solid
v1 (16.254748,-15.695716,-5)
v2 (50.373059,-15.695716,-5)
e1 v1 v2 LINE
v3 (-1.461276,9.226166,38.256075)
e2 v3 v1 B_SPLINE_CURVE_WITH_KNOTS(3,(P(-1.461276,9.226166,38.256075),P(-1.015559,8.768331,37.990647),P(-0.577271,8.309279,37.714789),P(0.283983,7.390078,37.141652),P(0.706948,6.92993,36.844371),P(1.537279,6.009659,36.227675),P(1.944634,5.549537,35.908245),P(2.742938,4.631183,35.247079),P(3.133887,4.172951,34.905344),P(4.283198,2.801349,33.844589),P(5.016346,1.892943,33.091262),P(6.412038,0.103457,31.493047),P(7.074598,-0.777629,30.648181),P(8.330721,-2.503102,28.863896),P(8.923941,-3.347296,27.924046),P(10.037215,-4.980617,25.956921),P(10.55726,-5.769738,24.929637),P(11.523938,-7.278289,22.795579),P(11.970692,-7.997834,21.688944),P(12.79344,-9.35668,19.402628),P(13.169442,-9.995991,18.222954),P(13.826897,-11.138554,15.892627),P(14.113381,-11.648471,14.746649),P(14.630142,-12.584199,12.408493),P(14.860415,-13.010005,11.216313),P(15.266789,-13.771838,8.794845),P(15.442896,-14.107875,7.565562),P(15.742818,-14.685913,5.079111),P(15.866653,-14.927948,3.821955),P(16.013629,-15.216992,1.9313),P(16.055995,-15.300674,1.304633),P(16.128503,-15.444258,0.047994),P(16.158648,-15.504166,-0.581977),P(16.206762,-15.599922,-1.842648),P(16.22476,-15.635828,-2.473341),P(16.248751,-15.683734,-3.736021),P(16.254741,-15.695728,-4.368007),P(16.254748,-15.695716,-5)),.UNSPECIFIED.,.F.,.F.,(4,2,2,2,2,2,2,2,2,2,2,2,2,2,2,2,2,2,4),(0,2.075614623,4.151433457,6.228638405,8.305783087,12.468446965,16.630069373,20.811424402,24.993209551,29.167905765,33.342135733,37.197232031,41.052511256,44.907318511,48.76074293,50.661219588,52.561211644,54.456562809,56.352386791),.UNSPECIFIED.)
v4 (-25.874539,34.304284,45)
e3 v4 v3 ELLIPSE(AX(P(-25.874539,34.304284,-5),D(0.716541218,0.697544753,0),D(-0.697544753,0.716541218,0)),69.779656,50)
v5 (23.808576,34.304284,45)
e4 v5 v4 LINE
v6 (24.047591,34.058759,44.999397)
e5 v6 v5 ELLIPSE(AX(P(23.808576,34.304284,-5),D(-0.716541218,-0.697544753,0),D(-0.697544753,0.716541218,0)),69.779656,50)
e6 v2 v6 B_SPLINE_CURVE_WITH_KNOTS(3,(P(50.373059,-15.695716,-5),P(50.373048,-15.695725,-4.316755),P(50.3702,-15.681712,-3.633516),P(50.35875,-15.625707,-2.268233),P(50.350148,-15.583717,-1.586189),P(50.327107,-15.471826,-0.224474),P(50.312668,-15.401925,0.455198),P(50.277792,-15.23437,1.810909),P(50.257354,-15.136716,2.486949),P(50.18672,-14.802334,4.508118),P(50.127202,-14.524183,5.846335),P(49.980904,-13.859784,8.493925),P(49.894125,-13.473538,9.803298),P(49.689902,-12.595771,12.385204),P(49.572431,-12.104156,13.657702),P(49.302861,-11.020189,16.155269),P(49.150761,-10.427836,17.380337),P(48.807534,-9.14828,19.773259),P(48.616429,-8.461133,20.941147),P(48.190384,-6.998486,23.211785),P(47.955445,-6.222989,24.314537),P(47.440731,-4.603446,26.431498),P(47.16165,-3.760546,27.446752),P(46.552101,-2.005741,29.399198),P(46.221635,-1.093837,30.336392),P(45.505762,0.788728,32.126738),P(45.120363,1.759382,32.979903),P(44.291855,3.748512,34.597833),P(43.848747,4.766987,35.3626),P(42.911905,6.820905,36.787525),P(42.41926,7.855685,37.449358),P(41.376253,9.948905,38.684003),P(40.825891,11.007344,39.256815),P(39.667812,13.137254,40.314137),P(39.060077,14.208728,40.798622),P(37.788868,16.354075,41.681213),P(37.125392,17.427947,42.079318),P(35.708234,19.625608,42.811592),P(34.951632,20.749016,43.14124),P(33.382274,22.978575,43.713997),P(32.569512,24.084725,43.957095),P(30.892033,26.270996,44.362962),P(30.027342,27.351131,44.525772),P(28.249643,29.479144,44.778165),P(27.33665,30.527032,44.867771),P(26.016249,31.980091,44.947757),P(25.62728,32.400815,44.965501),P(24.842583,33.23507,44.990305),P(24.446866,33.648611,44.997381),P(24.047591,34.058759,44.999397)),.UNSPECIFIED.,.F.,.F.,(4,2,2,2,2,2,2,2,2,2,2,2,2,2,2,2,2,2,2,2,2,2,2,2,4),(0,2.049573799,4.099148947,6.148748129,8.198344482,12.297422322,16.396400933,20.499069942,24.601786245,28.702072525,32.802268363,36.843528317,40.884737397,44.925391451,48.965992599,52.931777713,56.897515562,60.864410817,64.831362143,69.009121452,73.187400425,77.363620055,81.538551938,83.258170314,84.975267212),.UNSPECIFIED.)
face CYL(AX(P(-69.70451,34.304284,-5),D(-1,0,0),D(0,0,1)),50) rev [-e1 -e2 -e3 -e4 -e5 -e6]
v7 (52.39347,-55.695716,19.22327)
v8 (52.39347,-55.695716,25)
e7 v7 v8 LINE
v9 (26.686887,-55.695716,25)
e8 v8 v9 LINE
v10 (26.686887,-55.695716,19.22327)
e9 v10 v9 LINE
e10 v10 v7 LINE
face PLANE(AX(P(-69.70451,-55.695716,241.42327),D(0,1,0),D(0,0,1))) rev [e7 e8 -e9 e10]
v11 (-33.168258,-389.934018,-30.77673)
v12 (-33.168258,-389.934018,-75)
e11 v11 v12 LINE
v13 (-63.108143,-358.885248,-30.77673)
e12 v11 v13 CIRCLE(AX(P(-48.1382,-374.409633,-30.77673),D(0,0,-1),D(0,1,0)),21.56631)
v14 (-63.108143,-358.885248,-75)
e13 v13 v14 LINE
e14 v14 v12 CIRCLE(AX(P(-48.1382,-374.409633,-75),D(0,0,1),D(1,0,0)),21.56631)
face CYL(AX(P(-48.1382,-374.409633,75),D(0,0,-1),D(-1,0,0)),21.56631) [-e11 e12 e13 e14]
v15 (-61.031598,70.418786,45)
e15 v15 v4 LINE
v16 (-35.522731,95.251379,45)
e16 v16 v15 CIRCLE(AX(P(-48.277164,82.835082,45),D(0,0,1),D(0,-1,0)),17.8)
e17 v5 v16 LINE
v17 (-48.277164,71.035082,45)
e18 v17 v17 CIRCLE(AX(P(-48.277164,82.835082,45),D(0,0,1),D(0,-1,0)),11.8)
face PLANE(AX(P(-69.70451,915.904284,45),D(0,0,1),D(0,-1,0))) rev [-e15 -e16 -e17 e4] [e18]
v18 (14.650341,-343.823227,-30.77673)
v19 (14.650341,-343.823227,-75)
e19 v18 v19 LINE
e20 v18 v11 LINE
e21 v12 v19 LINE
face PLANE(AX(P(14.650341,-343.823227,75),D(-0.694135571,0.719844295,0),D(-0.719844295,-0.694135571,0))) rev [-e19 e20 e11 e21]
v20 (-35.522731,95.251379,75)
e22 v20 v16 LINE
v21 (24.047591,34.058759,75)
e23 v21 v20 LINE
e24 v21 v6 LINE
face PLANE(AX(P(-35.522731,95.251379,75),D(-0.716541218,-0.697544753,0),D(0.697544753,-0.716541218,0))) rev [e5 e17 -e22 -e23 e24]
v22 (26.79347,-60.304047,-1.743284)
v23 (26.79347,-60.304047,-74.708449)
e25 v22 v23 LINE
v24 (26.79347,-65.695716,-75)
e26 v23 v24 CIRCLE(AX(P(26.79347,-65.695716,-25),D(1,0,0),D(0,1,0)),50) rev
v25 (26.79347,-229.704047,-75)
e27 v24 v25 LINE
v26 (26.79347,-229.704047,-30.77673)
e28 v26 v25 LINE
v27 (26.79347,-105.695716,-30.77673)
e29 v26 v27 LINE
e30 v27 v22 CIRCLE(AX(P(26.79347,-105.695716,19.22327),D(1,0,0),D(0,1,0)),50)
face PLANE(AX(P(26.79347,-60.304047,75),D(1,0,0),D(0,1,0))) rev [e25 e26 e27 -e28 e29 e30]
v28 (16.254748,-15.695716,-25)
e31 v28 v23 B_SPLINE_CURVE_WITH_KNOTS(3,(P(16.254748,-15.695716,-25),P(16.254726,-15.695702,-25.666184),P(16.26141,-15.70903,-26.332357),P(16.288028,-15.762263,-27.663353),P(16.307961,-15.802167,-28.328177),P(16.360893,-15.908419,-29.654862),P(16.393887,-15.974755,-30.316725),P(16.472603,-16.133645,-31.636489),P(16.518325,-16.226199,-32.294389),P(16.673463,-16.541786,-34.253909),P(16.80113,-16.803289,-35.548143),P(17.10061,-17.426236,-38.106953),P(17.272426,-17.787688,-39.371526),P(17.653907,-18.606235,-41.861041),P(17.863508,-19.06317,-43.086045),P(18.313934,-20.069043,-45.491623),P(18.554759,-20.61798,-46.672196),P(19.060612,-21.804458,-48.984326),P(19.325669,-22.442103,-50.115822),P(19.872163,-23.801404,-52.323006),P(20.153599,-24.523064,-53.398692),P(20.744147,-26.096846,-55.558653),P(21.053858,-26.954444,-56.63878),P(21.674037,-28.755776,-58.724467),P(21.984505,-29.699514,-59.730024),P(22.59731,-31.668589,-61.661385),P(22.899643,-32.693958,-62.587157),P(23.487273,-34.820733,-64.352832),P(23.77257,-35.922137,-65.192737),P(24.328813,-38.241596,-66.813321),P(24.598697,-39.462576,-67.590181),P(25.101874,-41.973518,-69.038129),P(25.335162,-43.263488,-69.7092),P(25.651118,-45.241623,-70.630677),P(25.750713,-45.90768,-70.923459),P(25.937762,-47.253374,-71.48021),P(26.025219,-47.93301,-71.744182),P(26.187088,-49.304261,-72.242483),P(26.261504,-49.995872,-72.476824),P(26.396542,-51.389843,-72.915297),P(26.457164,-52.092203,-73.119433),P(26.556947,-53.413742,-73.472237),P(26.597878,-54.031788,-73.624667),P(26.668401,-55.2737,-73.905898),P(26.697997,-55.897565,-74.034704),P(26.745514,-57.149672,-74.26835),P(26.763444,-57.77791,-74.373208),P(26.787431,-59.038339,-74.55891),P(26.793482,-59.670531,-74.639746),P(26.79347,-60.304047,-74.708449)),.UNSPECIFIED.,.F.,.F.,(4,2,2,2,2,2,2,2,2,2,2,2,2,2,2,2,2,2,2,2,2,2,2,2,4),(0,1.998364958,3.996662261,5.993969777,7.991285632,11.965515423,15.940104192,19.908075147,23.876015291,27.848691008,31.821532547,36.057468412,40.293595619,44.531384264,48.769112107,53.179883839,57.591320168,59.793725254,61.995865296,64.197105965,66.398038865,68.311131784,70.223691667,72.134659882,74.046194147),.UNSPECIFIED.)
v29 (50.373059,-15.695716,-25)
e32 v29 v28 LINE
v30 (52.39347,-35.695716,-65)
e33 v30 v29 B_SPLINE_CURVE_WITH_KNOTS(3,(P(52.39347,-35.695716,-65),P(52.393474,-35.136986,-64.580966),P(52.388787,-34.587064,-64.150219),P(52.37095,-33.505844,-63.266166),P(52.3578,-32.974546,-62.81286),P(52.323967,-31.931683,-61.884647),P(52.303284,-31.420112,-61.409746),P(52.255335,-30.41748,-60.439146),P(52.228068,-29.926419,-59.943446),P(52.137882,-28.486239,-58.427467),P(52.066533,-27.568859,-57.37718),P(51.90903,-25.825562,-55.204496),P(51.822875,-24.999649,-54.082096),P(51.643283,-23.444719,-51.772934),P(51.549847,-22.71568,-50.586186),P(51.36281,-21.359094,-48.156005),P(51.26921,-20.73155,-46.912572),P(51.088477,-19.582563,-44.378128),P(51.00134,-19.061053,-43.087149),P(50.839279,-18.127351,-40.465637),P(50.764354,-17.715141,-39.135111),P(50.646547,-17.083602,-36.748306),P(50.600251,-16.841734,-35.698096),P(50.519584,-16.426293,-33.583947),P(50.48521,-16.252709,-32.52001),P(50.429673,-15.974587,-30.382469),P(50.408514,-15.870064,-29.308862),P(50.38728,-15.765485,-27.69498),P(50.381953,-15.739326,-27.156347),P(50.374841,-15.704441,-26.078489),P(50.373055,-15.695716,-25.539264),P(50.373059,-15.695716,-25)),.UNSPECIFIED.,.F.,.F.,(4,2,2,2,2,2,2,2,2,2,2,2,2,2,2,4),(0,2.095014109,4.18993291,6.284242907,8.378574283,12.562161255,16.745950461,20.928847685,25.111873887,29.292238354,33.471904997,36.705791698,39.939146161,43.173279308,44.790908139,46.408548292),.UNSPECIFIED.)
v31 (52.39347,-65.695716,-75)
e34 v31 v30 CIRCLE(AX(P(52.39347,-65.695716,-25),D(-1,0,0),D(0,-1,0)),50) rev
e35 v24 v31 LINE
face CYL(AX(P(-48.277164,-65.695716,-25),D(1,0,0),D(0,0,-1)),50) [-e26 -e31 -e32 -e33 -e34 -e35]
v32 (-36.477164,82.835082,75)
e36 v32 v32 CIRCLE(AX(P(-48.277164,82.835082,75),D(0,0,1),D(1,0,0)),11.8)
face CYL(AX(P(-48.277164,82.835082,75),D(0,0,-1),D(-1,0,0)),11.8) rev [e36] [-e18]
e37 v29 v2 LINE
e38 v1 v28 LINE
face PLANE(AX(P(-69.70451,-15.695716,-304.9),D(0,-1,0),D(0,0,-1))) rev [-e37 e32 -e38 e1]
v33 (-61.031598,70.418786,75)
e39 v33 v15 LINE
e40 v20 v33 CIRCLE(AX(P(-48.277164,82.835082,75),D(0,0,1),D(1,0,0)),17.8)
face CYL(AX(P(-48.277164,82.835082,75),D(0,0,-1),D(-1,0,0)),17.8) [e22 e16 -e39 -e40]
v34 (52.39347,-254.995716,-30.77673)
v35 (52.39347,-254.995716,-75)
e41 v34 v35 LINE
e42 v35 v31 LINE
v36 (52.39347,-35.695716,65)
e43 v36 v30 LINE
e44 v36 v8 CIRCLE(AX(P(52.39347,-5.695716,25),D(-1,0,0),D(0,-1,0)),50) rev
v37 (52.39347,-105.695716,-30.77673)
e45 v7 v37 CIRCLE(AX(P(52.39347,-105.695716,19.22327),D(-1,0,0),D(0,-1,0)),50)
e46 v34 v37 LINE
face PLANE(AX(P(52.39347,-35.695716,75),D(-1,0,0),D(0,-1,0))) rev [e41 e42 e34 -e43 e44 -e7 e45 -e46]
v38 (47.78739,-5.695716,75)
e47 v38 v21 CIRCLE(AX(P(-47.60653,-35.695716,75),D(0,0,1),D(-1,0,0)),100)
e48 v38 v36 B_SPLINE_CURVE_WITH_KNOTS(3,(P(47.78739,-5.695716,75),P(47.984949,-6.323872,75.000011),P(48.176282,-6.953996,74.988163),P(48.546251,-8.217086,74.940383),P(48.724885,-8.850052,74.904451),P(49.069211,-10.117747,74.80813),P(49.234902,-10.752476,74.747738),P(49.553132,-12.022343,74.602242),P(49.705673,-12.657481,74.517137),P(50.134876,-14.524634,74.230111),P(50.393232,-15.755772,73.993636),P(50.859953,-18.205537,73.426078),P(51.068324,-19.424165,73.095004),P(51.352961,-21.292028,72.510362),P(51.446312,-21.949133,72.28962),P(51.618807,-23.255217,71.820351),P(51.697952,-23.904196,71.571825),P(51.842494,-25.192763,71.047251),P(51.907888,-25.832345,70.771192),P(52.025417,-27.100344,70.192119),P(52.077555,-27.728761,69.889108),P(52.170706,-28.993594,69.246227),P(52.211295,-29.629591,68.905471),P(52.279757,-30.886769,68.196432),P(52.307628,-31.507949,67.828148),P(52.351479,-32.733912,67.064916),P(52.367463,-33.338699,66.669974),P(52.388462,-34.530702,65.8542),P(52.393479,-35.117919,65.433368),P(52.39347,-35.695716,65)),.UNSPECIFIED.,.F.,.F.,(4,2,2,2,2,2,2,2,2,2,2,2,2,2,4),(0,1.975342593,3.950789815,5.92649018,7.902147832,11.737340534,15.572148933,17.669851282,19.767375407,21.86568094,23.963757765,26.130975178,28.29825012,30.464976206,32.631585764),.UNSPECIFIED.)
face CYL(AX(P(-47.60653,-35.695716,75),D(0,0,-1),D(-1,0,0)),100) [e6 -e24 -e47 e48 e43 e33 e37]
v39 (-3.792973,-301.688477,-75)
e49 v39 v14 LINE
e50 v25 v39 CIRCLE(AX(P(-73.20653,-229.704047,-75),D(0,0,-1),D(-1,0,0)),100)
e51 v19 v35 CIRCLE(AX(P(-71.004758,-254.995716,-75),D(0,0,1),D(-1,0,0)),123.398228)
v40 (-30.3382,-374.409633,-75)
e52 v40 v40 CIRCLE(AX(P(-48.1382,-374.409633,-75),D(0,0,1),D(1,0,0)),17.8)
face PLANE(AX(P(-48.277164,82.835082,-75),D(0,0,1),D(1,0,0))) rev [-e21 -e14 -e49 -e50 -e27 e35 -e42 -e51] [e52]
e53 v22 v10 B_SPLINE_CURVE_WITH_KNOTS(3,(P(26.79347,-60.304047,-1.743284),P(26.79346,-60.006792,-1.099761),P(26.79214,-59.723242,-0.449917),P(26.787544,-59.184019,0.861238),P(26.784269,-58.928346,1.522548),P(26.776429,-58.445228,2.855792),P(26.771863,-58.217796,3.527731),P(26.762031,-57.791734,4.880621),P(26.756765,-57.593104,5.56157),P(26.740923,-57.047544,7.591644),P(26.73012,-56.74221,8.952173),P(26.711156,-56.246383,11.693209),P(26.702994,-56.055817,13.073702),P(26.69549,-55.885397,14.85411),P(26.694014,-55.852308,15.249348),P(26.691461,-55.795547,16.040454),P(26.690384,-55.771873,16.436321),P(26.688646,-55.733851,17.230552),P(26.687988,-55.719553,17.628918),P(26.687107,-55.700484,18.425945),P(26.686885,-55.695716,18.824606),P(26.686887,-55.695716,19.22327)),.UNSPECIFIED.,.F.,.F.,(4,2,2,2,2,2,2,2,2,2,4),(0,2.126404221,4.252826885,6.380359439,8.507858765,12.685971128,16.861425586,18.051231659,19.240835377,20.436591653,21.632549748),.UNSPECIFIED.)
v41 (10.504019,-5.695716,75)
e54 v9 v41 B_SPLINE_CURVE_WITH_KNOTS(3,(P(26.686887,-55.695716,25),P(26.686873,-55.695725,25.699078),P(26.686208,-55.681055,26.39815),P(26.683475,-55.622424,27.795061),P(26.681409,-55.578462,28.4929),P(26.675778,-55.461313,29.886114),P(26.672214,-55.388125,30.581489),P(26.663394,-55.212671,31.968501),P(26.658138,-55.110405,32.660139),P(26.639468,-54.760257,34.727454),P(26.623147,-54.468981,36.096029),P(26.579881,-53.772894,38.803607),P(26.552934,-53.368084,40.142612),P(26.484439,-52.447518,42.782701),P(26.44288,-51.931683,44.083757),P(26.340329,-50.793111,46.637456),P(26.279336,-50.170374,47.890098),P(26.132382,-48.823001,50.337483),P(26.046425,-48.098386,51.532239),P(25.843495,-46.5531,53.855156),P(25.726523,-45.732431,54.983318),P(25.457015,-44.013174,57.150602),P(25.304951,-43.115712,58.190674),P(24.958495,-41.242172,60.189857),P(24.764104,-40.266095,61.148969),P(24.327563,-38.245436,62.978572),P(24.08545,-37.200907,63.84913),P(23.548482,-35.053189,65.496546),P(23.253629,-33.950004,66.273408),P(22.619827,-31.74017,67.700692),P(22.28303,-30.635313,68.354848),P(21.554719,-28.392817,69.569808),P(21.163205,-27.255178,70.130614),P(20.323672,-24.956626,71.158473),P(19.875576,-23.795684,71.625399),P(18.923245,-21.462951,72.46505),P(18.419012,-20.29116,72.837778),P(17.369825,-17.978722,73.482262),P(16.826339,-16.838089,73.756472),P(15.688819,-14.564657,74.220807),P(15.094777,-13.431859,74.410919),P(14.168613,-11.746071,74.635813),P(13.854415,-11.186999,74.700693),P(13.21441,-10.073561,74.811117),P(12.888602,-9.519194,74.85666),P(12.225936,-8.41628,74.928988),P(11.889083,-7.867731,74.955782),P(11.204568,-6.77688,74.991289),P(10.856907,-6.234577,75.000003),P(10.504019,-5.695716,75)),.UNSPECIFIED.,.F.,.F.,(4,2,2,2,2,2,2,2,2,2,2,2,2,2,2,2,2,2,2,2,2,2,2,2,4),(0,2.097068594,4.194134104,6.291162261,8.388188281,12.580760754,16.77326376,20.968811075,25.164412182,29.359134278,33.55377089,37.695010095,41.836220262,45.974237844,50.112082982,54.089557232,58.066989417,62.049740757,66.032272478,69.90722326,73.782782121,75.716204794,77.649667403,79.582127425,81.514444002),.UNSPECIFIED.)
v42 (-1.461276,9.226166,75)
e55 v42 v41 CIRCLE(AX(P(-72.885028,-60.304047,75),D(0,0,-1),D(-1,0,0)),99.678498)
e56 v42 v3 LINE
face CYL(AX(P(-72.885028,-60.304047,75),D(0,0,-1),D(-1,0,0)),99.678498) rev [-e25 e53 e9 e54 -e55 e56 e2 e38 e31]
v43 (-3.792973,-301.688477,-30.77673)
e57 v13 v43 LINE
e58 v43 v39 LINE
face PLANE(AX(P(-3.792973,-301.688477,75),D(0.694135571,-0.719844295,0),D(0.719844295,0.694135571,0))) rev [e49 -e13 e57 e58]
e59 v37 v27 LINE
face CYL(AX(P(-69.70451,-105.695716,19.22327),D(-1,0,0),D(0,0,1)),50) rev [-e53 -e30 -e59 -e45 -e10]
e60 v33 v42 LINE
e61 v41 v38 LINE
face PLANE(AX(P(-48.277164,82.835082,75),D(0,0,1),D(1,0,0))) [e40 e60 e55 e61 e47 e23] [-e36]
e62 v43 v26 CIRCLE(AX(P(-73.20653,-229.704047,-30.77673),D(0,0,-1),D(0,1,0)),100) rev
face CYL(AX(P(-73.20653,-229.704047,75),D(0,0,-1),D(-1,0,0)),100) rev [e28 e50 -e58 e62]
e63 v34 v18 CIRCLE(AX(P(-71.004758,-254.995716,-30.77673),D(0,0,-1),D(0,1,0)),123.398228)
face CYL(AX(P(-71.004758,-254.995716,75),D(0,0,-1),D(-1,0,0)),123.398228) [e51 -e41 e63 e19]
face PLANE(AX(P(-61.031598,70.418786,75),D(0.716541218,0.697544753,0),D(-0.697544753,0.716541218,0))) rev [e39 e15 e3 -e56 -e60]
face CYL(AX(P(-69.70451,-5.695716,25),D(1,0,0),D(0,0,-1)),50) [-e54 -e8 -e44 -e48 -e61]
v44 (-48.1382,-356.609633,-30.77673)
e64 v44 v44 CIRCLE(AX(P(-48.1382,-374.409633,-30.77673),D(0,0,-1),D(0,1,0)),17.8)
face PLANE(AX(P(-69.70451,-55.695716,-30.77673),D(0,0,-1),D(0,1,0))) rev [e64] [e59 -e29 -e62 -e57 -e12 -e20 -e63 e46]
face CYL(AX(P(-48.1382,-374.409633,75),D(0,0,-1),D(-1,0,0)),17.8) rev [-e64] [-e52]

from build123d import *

# Parameters (mm, degrees)
SKETCH_1_R               = 11.8
SKETCH_1_R_2             = 17.8
EXTRUDE_2_DEPTH          = 75
CUT_EXTRUDE_1_DEPTH      = 409.99959193
CUT_EXTRUDE_1_DEPTH_BACK = 409.99959193
SKETCH_2_W               = 349.9
SKETCH_2_H               = 931.6
SKETCH_2_W_2             = 272.2
SKETCH_2_H_2             = 1939.2
FILLET_1_R               = 50


with BuildPart() as part:
    # 草图1 → 凸台-拉伸2 (new, symmetric)
    with BuildSketch(Plane.XY):
        with BuildLine():
            Line((-35.522730508, 95.251379062), (24.047591424, 34.058759041))
            ThreePointArc((24.047591424, 34.058759041), (45.036365139, 1.951247863), (52.39346962, -35.695716288))
            Line((52.39346962, -35.695716288), (52.39346962, -254.995716288))
            ThreePointArc((52.39346962, -254.995716288), (42.566387073, -303.252504348), (14.650341024, -343.823226775))
            Line((14.650341024, -343.823226775), (-33.168257533, -389.93401824))
            ThreePointArc((-33.168257533, -389.93401824), (-63.662585593, -389.379575912), (-63.108143264, -358.885247852))
            Line((-63.108143264, -358.885247852), (-3.792973322, -301.688476836))
            ThreePointArc((-3.792973322, -301.688476836), (18.829755143, -268.810595941), (26.79346962, -229.704047294))
            Line((26.79346962, -229.704047294), (26.79346962, -60.304047294))
            ThreePointArc((26.79346962, -60.304047294), (19.460018396, -22.778118982), (-1.461275938, 9.226165824))
            Line((-1.461275938, 9.226165824), (-61.03159787, 70.418785844))
            ThreePointArc((-61.03159787, 70.418785844), (-60.693460797, 95.589516134), (-35.522730508, 95.251379062))
        make_face()
        with Locations((-48.277164189, 82.835082453)):
            Circle(SKETCH_1_R, mode=Mode.SUBTRACT)
        with Locations((-48.138200399, -374.409633046)):
            Circle(SKETCH_1_R_2, mode=Mode.SUBTRACT)
    extrude(amount=EXTRUDE_2_DEPTH, both=True)

    # 草图2 → 切除-拉伸1 (cut, two sides: drawn at the far end of the back side and taken through both)
    with BuildSketch(Plane(origin=(0, 0, 0), x_dir=(0, 0, -1), z_dir=(1, 0, 0)).offset(-CUT_EXTRUDE_1_DEPTH_BACK)):
        with Locations((129.95, 450.104283712)):
            Rectangle(SKETCH_2_W, SKETCH_2_H)
        with Locations((-105.32326979, -1025.295716288)):
            Rectangle(SKETCH_2_W_2, SKETCH_2_H_2)
    extrude(amount=CUT_EXTRUDE_1_DEPTH + CUT_EXTRUDE_1_DEPTH_BACK, mode=Mode.SUBTRACT)

    # 圆角1
    fillet_1_edges = [part.edges().sort_by_distance(p)[0] for p in [
        (33.313903749, -15.695716288, 45),
        (39.5401781, -55.695716288, -30.77673021),
    ]]
    fillet(fillet_1_edges, radius=FILLET_1_R)
    fillet_1_2_edges = [part.edges().sort_by_distance(p)[0] for p in [
        (39.5401781, -55.695716288, 75),
        (33.313903749, -15.695716288, -75),
    ]]
    fillet(fillet_1_2_edges, radius=FILLET_1_R)


solid = part.part
